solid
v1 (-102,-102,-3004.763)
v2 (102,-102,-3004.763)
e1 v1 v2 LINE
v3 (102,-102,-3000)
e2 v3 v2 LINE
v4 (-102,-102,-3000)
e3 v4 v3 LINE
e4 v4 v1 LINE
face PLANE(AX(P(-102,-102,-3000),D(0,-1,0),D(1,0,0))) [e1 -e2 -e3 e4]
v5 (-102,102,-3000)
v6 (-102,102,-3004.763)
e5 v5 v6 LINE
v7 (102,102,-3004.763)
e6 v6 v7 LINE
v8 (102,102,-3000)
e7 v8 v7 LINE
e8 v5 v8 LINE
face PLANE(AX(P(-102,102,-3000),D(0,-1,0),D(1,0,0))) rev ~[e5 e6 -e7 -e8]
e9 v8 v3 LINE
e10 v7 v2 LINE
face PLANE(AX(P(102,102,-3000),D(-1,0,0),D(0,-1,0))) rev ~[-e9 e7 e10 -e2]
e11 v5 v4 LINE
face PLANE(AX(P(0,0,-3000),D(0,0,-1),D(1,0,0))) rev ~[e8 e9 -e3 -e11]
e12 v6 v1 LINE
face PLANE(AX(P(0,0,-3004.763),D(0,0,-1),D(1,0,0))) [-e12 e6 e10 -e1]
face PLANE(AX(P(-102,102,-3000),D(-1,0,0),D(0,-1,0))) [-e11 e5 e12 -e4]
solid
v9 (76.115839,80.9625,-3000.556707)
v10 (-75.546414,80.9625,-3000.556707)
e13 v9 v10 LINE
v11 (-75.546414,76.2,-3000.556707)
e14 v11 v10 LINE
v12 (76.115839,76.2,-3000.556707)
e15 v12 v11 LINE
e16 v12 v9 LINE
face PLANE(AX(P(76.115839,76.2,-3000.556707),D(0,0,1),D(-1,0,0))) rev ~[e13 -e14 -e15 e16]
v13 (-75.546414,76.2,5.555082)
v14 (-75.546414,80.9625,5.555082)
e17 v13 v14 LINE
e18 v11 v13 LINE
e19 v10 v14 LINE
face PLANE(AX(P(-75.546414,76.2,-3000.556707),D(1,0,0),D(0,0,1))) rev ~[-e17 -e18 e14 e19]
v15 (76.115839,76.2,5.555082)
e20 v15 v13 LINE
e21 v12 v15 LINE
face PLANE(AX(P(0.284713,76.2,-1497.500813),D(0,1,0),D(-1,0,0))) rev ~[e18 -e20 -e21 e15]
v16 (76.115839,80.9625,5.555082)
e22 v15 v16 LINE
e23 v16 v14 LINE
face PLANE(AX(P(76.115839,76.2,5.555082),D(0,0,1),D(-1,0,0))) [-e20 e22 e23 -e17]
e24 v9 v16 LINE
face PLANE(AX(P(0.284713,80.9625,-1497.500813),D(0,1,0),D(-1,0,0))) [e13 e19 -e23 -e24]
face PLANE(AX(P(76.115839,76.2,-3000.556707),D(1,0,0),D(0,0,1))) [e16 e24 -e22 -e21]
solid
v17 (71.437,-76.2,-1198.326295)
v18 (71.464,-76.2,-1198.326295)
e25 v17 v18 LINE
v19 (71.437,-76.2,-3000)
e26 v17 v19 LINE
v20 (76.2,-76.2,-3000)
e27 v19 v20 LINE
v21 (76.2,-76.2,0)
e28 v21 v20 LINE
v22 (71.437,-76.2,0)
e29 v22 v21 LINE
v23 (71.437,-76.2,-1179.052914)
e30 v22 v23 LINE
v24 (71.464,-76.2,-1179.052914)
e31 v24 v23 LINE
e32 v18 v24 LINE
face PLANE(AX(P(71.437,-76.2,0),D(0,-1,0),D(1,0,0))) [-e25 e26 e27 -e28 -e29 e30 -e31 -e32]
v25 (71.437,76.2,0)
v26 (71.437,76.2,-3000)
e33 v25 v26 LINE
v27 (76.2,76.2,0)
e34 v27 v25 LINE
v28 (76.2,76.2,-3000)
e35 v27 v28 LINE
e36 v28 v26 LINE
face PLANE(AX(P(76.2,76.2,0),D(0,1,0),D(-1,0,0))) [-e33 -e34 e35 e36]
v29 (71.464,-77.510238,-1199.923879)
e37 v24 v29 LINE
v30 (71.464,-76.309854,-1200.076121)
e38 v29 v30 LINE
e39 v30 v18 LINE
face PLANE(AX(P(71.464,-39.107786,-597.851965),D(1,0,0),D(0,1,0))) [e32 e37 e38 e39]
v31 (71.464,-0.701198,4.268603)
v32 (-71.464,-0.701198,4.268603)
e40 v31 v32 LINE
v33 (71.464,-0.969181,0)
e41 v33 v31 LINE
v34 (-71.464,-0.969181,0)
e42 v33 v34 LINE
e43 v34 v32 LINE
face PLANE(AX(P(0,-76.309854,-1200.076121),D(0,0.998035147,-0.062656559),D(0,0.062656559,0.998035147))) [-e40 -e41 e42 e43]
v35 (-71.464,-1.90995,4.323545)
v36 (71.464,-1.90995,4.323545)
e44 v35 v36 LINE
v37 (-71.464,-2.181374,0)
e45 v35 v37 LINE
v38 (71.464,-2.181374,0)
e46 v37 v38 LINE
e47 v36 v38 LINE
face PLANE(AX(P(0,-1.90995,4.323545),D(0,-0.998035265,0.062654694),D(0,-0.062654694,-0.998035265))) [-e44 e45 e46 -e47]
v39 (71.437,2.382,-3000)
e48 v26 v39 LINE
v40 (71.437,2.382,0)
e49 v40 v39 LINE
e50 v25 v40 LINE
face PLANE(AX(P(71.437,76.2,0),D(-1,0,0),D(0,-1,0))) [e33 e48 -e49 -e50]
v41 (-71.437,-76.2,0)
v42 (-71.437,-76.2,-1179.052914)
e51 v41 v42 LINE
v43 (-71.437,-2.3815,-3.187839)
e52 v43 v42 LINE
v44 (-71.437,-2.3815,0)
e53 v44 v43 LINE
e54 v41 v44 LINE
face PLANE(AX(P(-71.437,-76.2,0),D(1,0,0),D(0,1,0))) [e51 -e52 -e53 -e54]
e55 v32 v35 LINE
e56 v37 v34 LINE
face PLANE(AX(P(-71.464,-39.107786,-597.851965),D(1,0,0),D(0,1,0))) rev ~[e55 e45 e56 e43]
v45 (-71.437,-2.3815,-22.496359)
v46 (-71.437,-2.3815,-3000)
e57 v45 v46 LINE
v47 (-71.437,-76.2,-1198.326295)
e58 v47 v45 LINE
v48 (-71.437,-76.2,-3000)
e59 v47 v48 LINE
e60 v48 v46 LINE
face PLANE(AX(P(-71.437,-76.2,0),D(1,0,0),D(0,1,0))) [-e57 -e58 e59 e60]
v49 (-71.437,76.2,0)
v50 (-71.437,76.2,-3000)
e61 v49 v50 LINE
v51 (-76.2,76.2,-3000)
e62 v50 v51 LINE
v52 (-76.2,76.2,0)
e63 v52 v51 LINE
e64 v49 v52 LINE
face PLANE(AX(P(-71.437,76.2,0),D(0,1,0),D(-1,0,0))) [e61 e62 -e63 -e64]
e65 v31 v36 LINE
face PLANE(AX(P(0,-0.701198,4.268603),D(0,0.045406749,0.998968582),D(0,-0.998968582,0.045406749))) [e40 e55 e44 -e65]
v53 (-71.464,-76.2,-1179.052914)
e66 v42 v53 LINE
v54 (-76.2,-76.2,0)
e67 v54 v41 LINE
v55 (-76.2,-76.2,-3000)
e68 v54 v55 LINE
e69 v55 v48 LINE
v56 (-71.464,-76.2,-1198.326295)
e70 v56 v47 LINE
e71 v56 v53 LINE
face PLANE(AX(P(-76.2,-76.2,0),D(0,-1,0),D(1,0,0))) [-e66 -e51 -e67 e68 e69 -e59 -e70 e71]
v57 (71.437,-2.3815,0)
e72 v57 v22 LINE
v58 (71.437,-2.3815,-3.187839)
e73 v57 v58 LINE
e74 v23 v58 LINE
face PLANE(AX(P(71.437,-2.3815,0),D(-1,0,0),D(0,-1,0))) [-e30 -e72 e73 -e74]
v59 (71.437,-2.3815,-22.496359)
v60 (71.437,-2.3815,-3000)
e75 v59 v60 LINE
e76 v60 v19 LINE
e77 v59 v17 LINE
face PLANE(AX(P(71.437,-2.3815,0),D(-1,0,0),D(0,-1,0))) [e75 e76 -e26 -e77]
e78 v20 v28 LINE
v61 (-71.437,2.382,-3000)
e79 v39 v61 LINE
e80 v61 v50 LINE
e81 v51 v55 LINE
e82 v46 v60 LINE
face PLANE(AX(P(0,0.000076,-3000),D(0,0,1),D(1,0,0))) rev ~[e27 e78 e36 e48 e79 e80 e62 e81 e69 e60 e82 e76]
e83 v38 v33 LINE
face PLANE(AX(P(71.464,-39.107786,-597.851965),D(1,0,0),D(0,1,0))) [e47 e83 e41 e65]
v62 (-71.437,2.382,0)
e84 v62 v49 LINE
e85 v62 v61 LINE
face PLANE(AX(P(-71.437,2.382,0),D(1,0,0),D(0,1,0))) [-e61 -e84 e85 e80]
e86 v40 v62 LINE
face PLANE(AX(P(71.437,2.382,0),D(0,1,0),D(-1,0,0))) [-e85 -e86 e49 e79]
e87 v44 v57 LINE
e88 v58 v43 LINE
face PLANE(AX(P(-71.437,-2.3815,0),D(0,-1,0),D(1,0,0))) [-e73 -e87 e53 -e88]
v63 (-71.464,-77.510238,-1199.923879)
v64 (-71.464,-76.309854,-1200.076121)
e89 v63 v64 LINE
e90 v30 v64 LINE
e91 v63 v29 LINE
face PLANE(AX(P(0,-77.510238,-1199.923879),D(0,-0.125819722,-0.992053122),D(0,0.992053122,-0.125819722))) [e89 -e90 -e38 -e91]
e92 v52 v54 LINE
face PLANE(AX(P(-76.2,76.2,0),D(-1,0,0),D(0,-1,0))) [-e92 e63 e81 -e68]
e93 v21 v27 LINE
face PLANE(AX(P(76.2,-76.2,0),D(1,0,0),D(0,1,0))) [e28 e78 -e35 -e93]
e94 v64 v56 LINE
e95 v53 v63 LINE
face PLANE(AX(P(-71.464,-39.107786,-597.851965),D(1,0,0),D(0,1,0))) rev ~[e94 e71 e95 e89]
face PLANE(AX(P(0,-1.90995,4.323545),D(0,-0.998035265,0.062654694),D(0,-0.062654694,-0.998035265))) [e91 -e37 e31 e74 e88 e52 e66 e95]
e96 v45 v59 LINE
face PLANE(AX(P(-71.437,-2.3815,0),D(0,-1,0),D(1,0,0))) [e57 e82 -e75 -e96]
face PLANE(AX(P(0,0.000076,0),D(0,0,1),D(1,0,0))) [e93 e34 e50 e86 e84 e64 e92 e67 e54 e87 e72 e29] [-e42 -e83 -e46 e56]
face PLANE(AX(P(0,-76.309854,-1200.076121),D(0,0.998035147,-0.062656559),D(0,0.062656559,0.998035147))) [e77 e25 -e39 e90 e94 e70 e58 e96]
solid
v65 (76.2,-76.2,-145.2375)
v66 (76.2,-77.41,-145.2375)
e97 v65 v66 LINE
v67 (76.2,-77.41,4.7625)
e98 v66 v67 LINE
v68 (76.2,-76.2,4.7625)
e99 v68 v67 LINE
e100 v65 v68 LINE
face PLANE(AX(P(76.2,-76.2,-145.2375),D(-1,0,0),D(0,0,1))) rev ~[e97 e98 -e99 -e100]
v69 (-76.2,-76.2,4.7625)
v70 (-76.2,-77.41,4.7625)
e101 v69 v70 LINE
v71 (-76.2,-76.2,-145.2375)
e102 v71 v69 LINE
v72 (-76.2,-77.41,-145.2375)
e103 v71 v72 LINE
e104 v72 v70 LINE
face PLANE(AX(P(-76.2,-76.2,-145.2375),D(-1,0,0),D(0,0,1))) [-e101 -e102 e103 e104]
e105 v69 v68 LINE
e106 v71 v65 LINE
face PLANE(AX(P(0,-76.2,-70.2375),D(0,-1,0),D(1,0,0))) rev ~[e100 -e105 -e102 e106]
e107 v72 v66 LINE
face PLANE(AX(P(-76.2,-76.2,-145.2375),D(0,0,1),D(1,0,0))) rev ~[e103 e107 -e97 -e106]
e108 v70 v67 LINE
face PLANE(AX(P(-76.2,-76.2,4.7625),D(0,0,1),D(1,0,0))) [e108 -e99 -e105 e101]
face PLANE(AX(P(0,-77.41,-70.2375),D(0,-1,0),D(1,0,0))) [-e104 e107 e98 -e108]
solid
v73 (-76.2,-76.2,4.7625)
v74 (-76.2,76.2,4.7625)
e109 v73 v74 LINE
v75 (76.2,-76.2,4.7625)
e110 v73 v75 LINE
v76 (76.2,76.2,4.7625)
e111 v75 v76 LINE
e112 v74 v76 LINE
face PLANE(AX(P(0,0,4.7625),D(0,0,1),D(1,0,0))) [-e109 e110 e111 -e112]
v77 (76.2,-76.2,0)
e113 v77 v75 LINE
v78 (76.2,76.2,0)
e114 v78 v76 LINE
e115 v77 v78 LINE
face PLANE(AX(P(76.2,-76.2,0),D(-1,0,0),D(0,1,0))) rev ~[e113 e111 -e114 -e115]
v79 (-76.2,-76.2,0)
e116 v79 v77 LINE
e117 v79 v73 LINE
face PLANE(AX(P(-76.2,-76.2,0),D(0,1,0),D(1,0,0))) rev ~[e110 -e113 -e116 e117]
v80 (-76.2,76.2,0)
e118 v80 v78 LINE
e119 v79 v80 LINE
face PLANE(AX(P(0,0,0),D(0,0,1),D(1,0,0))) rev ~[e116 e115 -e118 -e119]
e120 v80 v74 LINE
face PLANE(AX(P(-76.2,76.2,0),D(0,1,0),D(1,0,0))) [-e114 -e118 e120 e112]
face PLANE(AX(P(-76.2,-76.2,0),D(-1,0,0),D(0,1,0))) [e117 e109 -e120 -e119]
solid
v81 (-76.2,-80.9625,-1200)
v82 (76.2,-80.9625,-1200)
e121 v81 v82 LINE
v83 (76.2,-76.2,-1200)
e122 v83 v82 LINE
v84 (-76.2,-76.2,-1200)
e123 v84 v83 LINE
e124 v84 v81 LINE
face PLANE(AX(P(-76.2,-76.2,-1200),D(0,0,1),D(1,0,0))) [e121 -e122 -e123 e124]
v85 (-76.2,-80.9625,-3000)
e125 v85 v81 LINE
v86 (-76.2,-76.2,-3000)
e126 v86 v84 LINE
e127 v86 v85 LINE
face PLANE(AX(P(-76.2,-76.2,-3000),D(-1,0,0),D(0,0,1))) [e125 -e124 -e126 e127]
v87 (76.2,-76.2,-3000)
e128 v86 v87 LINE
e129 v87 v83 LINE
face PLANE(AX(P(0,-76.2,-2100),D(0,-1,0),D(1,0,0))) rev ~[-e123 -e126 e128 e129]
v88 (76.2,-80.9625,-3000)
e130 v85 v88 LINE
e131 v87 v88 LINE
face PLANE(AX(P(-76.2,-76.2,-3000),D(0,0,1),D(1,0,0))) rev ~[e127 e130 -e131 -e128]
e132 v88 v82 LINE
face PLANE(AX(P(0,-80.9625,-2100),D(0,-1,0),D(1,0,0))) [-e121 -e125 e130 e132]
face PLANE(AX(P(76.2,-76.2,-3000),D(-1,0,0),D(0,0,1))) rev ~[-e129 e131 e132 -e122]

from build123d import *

# Parameters (mm, degrees)
F1_DEPTH  = 3000
F2_W      = 152.4
F2_H      = 152.4
F3_DEPTH  = 4.7625
F4_W      = 151.6622528434
F4_H      = 3006.1117890291
F5_DEPTH  = 4.7625
F6_W      = 152.4
F6_H      = 150
F7_DEPTH  = 1.21
F9_DEPTH  = 71.464
F10_W     = 152.4
F10_H     = 1800
F11_DEPTH = 4.7625
F12_W     = 204
F12_H     = 204
F13_DEPTH = 4.763


# Not quite as in the source:
# - a length typed as a fraction of an inch, garbled in the dataset ("3 / 203.2 mm" for 3/8 in), is restored


with BuildPart() as f1:
    # F0 (on Top) → F1 (new body)
    with BuildSketch(Plane.XY):
        Polygon((-76.2, 76.2), (-76.2, -76.2), (-71.437, -76.2), (-71.437, -2.3815), (71.437, -2.3815), (71.437, -76.2), (76.2, -76.2), (76.2, 76.2), (71.437, 76.2), (71.437, 2.382), (-71.437, 2.382), (-71.437, 76.2), align=None)
    extrude(amount=-F1_DEPTH)

    # F8 (on Right) → F9 (join, symmetric)
    with BuildSketch(Plane.YZ):
        Polygon((-0.7011980658, 4.2686027455), (-1.9099500496, 4.323544912), (-77.5102381694, -1199.9238790681), (-76.3098538914, -1200.0761209319), align=None)
    extrude(amount=F9_DEPTH, both=True)


with BuildPart() as f3:
    # F2 (on face) → F3 (new body)
    with BuildSketch(Plane.XY):
        Rectangle(F2_W, F2_H)
    extrude(amount=F3_DEPTH)


with BuildPart() as f5:
    # F4 (on face) → F5 (new body)
    with BuildSketch(Plane(origin=(0, 76.2, 0), x_dir=(-1, 0, 0), z_dir=(0, 1, 0))):
        with Locations((-0.2847127616, -1497.5008128677)):
            Rectangle(F4_W, F4_H)
    extrude(amount=F5_DEPTH)


with BuildPart() as f7:
    # F6 (on face) → F7 (new body)
    with BuildSketch(Plane.XZ.offset(76.2)):
        with Locations((0, -70.2375)):
            Rectangle(F6_W, F6_H)
    extrude(amount=F7_DEPTH)


with BuildPart() as f11:
    # F10 (on face) → F11 (new body)
    with BuildSketch(Plane.XZ.offset(76.2)):
        with Locations((0, -2100)):
            Rectangle(F10_W, F10_H)
    extrude(amount=F11_DEPTH)


with BuildPart() as f13:
    # F12 (on face) → F13 (new body)
    with BuildSketch(Plane(origin=(0, 0, -3000), x_dir=(1, 0, 0), z_dir=(0, 0, -1))):
        Rectangle(F12_W, F12_H)
    extrude(amount=F13_DEPTH)


solid = Compound([f1.part, f3.part, f5.part, f7.part, f11.part, f13.part])
